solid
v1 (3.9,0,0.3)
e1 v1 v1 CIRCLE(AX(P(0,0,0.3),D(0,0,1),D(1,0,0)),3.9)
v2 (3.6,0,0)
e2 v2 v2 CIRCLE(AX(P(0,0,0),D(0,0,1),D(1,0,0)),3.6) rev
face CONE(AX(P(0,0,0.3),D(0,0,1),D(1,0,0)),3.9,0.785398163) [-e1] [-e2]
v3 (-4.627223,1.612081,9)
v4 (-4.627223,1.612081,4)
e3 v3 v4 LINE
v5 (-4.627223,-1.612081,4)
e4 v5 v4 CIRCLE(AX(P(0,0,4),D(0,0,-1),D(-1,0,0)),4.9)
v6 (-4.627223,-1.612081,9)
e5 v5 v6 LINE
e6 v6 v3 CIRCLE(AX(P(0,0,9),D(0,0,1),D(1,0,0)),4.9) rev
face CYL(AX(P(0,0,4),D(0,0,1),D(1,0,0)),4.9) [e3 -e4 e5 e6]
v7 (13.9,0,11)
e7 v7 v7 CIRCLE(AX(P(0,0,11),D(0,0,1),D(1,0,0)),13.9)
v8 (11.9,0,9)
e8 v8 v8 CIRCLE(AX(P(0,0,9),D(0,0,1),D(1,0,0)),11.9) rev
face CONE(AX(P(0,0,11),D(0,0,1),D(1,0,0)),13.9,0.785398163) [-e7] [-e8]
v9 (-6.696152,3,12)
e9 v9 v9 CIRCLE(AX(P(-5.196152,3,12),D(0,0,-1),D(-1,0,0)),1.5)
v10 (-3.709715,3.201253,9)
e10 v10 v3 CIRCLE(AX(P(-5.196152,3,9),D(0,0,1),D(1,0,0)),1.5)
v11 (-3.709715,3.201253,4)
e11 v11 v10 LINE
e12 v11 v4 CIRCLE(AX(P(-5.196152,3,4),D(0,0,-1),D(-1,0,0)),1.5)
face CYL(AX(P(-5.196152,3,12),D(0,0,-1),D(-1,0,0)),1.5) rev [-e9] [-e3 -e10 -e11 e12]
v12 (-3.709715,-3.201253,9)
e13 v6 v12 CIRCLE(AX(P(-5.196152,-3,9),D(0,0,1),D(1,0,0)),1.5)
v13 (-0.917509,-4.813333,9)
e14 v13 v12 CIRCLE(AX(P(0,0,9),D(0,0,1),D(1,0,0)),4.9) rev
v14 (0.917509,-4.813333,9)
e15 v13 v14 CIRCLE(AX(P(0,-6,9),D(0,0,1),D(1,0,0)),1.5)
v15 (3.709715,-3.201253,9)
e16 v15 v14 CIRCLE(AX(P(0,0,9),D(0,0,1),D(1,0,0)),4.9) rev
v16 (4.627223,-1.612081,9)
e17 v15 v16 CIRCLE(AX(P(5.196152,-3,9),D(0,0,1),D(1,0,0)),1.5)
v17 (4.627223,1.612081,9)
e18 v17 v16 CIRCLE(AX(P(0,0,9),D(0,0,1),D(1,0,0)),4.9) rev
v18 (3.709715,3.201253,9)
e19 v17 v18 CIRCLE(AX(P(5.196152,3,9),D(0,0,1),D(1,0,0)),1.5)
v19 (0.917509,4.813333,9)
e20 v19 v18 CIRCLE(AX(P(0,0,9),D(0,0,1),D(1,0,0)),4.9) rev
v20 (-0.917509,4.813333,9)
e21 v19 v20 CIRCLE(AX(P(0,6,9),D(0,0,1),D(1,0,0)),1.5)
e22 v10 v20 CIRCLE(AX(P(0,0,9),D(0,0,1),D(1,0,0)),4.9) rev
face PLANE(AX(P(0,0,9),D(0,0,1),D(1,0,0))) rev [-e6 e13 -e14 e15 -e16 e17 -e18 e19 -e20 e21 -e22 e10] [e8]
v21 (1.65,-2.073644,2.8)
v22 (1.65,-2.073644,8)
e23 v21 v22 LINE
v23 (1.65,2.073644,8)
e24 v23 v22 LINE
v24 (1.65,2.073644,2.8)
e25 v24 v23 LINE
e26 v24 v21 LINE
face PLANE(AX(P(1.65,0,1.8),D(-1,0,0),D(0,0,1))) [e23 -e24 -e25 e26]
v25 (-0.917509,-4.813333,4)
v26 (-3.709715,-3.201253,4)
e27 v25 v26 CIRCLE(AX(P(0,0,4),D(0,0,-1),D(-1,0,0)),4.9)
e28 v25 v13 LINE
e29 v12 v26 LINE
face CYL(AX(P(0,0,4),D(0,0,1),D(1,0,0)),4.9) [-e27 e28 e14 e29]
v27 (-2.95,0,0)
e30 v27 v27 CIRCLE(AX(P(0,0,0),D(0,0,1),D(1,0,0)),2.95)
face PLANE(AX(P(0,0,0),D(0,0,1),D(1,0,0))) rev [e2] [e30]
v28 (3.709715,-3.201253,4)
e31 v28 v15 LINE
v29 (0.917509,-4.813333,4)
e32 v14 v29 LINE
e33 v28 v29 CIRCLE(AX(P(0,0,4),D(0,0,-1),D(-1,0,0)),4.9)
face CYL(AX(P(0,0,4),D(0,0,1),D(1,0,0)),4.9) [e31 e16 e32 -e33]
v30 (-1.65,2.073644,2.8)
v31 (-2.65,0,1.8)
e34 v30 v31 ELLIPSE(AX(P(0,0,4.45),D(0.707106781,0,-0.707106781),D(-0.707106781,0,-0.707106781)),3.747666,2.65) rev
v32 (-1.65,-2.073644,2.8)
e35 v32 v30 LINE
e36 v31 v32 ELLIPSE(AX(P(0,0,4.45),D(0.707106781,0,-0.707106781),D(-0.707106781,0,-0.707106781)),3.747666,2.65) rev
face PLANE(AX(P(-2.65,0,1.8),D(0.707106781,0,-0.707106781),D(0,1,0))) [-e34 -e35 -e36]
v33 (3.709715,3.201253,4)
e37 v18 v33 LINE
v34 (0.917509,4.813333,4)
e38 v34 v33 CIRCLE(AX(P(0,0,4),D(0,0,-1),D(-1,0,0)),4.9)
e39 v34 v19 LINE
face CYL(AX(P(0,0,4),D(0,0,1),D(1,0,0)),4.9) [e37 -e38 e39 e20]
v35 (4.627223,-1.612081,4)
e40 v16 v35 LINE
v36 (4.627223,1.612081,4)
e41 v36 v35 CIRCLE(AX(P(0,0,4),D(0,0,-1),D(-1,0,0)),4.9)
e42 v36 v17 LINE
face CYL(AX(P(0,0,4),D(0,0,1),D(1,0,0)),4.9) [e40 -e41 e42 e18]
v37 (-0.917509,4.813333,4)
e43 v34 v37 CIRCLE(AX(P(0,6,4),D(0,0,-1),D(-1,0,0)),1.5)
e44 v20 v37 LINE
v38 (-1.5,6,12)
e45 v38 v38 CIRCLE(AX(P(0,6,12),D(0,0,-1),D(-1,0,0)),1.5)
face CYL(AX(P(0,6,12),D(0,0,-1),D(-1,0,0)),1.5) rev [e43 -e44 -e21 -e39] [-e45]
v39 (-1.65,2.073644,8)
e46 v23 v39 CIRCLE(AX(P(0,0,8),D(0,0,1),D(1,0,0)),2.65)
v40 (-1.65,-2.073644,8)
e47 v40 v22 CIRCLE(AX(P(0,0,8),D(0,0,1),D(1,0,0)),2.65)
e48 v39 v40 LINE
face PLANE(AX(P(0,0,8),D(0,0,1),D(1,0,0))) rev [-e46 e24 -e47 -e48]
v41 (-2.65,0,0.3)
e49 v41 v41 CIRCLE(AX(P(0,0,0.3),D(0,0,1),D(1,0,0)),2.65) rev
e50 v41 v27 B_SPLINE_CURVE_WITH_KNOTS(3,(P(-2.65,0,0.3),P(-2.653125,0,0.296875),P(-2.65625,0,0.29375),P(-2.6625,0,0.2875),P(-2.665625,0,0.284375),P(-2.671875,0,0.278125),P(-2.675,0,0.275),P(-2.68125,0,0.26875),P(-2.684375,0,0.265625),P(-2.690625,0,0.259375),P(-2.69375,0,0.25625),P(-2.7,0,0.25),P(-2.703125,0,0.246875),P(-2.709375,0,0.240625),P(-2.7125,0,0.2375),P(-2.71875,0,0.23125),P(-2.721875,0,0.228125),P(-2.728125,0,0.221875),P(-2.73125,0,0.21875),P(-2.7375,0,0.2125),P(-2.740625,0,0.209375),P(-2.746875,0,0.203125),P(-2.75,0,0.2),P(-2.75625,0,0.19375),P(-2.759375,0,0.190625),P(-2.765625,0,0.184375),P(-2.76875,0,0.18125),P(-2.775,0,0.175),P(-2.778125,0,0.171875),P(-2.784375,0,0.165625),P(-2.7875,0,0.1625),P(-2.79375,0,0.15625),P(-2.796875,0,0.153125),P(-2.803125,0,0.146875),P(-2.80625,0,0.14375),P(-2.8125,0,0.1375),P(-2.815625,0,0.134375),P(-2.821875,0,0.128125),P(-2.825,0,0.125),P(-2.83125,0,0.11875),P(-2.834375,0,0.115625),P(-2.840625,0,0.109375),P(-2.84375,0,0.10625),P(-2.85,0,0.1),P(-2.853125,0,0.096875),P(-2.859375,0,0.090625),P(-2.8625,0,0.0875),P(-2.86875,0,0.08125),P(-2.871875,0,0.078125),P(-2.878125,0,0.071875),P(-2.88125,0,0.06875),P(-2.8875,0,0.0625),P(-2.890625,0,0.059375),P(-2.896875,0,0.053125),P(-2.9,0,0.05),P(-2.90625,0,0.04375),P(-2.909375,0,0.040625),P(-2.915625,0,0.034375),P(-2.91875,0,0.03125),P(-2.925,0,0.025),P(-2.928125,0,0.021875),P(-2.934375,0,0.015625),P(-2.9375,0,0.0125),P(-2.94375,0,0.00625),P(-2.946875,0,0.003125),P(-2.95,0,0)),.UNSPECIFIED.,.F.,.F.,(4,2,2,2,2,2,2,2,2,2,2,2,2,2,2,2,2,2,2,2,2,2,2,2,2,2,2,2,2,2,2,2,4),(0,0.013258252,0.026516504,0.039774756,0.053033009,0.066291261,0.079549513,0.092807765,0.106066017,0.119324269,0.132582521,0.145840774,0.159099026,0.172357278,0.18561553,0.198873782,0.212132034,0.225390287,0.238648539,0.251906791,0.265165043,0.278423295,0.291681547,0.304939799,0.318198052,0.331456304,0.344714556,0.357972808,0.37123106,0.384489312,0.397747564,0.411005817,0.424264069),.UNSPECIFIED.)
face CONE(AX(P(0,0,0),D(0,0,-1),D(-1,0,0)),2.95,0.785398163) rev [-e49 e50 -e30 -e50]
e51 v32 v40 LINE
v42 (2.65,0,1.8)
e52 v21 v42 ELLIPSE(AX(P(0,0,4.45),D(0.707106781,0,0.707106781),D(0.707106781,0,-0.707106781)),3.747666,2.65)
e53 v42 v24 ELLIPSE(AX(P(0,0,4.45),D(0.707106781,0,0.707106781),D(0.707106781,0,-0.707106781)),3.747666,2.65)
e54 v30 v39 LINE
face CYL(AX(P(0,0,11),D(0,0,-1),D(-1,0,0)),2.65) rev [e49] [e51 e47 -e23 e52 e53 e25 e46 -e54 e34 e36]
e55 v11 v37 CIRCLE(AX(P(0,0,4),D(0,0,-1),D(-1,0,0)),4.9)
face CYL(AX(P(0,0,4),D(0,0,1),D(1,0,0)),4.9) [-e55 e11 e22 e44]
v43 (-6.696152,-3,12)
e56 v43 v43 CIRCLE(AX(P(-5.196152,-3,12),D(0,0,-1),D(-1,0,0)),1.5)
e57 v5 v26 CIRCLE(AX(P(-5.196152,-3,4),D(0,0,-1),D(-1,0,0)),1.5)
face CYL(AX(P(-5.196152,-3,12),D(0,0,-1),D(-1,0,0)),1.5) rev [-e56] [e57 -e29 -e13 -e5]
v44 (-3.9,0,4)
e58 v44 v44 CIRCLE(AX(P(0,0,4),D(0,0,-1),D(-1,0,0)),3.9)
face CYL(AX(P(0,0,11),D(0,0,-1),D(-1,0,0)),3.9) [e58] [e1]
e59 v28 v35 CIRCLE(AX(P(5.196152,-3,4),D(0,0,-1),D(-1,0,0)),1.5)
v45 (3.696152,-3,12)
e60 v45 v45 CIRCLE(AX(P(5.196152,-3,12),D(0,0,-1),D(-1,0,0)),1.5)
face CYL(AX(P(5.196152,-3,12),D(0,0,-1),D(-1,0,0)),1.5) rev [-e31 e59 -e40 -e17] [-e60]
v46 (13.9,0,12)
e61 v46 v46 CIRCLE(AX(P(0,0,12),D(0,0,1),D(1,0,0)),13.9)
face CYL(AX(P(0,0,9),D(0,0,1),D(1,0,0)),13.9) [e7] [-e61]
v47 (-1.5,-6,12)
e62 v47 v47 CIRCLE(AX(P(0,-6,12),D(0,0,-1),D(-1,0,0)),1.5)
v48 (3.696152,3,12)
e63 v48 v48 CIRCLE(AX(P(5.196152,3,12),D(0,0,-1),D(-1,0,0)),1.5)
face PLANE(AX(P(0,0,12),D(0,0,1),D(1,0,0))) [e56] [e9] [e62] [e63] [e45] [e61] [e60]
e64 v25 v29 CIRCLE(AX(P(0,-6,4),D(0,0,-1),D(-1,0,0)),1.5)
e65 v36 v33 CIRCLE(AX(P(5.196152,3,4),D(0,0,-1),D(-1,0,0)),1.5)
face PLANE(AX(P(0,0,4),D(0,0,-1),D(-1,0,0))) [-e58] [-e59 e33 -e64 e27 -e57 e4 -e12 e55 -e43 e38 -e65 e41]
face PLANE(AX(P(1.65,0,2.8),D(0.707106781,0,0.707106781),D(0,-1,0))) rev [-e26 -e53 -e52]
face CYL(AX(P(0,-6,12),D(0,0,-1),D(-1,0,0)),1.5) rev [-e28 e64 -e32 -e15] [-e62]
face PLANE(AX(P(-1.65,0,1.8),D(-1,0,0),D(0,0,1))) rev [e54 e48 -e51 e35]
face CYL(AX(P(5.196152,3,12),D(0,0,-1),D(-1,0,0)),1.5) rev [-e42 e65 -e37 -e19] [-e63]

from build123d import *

# Parameters (mm, degrees)
SKETCH_1_R               = 3.9
SKETCH_1_R_2             = 2.65
EXTRUDE_1_DEPTH          = 11
EXTRUDE_START            = -3
SKETCH_2_R               = 2.65
EXTRUDE_2_DEPTH          = 3
EXTRUDE_START_2          = 6.2
EXTRUDE_3_DEPTH          = 6.2
CHAMFER_1_SIZE           = 0.3
CHAMFER_2_SIZE           = 0.3
EXTRUDE_4_DEPTH          = 1
EXTRUDE_4_DEPTH_BACK     = 2
SKETCH_4_R               = 13.9
SKETCH_5_R               = 4.9
SKETCH_5_R_2             = 3.7
EXTRUDE_5_DEPTH          = 5
CHAMFER_4_SIZE           = 2
CUT_EXTRUDE_1_DEPTH      = 22.619898242
CUT_EXTRUDE_1_DEPTH_BACK = 22.619898242
SKETCH_6_R               = 1.5
CHAMFER_5_SIZE           = 1
CHAMFER_6_SIZE           = 1


with BuildPart() as part:
    # 草图1 → 凸台-拉伸1 (new body)
    with BuildSketch(Plane.XY):
        Circle(SKETCH_1_R)
        Circle(SKETCH_1_R_2, mode=Mode.SUBTRACT)
    extrude(amount=EXTRUDE_1_DEPTH)

    # 草图2 → 凸台-拉伸2 (add)
    with BuildSketch(Plane.XY.offset(11).offset(EXTRUDE_START)):
        Circle(SKETCH_2_R)
    extrude(amount=EXTRUDE_2_DEPTH)

    # 草图3 → 凸台-拉伸3 (add)
    with BuildSketch(Plane(origin=(0, 0, 8), x_dir=(-1, 0, 0), z_dir=(0, 0, -1)).offset(EXTRUDE_START_2)):
        with BuildLine():
            Line((-1.65, -2.073644135), (-1.65, 2.073644135))
            ThreePointArc((-1.65, 2.073644135), (-2.65, 0), (-1.65, -2.073644135))
        make_face()
        with BuildLine():
            ThreePointArc((2.65, 0), (2.386943652, 1.151086443), (1.65, 2.073644135))
            Line((1.65, 2.073644135), (1.65, -2.073644135))
            ThreePointArc((1.65, -2.073644135), (2.386943652, -1.151086443), (2.65, 0))
        make_face()
    extrude(amount=-EXTRUDE_3_DEPTH)

    # 倒角1
    chamfer_1_edges = [part.edges().sort_by_distance(p)[0] for p in [
        (-2.65, 0, 0),
    ]]
    chamfer(chamfer_1_edges, length=CHAMFER_1_SIZE)

    # 倒角2
    chamfer_2_edges = [part.edges().sort_by_distance(p)[0] for p in [
        (-3.9, 0, 0),
    ]]
    chamfer(chamfer_2_edges, length=CHAMFER_2_SIZE)

    # 草图4 → 凸台-拉伸4 (add, two sides: drawn at the far end of the back side and taken through both)
    with BuildSketch(Plane.XY.offset(11).offset(-EXTRUDE_4_DEPTH_BACK)):
        Circle(SKETCH_4_R)
    extrude(amount=EXTRUDE_4_DEPTH + EXTRUDE_4_DEPTH_BACK)

    # 草图5 → 凸台-拉伸5 (add)
    with BuildSketch(Plane(origin=(0, 0, 9), x_dir=(-1, 0, 0), z_dir=(0, 0, -1))):
        with Locations(Location((0, 0, 0), (0, 0, 180))):
            Circle(SKETCH_5_R)
        Circle(SKETCH_5_R_2, mode=Mode.SUBTRACT)
    extrude(amount=EXTRUDE_5_DEPTH)

    # 倒角4
    chamfer_4_edges = [part.edges().sort_by_distance(p)[0] for p in [
        (-13.9, 0, 9),
    ]]
    chamfer(chamfer_4_edges, length=CHAMFER_4_SIZE)

    # 草图6 → 切除-拉伸1 (cut, two sides: drawn at the far end of the back side and taken through both)
    with BuildSketch(Plane(origin=(0, 0, 9), x_dir=(-1, 0, 0), z_dir=(0, 0, -1)).offset(-CUT_EXTRUDE_1_DEPTH_BACK)):
        with Locations((0, 6)):
            Circle(SKETCH_6_R)
        with Locations((5.196152423, 3)):
            Circle(SKETCH_6_R)
        with Locations((5.196152423, -3)):
            Circle(SKETCH_6_R)
        with Locations((0, -6)):
            Circle(SKETCH_6_R)
        with Locations((-5.196152423, -3)):
            Circle(SKETCH_6_R)
        with Locations((-5.196152423, 3)):
            Circle(SKETCH_6_R)
    extrude(amount=CUT_EXTRUDE_1_DEPTH + CUT_EXTRUDE_1_DEPTH_BACK, mode=Mode.SUBTRACT)

    # 倒角5
    chamfer_5_edges = [part.edges().sort_by_distance(p)[0] for p in [
        (-1.65, 0, 1.8),
    ]]
    chamfer(chamfer_5_edges, length=CHAMFER_5_SIZE - 0.0001)  # a hair under: the kernel refuses the full size

    # 倒角6
    chamfer_6_edges = [part.edges().sort_by_distance(p)[0] for p in [
        (1.65, 0, 1.8),
    ]]
    chamfer(chamfer_6_edges, length=CHAMFER_6_SIZE - 0.0001)  # a hair under: the kernel refuses the full size


solid = part.part
